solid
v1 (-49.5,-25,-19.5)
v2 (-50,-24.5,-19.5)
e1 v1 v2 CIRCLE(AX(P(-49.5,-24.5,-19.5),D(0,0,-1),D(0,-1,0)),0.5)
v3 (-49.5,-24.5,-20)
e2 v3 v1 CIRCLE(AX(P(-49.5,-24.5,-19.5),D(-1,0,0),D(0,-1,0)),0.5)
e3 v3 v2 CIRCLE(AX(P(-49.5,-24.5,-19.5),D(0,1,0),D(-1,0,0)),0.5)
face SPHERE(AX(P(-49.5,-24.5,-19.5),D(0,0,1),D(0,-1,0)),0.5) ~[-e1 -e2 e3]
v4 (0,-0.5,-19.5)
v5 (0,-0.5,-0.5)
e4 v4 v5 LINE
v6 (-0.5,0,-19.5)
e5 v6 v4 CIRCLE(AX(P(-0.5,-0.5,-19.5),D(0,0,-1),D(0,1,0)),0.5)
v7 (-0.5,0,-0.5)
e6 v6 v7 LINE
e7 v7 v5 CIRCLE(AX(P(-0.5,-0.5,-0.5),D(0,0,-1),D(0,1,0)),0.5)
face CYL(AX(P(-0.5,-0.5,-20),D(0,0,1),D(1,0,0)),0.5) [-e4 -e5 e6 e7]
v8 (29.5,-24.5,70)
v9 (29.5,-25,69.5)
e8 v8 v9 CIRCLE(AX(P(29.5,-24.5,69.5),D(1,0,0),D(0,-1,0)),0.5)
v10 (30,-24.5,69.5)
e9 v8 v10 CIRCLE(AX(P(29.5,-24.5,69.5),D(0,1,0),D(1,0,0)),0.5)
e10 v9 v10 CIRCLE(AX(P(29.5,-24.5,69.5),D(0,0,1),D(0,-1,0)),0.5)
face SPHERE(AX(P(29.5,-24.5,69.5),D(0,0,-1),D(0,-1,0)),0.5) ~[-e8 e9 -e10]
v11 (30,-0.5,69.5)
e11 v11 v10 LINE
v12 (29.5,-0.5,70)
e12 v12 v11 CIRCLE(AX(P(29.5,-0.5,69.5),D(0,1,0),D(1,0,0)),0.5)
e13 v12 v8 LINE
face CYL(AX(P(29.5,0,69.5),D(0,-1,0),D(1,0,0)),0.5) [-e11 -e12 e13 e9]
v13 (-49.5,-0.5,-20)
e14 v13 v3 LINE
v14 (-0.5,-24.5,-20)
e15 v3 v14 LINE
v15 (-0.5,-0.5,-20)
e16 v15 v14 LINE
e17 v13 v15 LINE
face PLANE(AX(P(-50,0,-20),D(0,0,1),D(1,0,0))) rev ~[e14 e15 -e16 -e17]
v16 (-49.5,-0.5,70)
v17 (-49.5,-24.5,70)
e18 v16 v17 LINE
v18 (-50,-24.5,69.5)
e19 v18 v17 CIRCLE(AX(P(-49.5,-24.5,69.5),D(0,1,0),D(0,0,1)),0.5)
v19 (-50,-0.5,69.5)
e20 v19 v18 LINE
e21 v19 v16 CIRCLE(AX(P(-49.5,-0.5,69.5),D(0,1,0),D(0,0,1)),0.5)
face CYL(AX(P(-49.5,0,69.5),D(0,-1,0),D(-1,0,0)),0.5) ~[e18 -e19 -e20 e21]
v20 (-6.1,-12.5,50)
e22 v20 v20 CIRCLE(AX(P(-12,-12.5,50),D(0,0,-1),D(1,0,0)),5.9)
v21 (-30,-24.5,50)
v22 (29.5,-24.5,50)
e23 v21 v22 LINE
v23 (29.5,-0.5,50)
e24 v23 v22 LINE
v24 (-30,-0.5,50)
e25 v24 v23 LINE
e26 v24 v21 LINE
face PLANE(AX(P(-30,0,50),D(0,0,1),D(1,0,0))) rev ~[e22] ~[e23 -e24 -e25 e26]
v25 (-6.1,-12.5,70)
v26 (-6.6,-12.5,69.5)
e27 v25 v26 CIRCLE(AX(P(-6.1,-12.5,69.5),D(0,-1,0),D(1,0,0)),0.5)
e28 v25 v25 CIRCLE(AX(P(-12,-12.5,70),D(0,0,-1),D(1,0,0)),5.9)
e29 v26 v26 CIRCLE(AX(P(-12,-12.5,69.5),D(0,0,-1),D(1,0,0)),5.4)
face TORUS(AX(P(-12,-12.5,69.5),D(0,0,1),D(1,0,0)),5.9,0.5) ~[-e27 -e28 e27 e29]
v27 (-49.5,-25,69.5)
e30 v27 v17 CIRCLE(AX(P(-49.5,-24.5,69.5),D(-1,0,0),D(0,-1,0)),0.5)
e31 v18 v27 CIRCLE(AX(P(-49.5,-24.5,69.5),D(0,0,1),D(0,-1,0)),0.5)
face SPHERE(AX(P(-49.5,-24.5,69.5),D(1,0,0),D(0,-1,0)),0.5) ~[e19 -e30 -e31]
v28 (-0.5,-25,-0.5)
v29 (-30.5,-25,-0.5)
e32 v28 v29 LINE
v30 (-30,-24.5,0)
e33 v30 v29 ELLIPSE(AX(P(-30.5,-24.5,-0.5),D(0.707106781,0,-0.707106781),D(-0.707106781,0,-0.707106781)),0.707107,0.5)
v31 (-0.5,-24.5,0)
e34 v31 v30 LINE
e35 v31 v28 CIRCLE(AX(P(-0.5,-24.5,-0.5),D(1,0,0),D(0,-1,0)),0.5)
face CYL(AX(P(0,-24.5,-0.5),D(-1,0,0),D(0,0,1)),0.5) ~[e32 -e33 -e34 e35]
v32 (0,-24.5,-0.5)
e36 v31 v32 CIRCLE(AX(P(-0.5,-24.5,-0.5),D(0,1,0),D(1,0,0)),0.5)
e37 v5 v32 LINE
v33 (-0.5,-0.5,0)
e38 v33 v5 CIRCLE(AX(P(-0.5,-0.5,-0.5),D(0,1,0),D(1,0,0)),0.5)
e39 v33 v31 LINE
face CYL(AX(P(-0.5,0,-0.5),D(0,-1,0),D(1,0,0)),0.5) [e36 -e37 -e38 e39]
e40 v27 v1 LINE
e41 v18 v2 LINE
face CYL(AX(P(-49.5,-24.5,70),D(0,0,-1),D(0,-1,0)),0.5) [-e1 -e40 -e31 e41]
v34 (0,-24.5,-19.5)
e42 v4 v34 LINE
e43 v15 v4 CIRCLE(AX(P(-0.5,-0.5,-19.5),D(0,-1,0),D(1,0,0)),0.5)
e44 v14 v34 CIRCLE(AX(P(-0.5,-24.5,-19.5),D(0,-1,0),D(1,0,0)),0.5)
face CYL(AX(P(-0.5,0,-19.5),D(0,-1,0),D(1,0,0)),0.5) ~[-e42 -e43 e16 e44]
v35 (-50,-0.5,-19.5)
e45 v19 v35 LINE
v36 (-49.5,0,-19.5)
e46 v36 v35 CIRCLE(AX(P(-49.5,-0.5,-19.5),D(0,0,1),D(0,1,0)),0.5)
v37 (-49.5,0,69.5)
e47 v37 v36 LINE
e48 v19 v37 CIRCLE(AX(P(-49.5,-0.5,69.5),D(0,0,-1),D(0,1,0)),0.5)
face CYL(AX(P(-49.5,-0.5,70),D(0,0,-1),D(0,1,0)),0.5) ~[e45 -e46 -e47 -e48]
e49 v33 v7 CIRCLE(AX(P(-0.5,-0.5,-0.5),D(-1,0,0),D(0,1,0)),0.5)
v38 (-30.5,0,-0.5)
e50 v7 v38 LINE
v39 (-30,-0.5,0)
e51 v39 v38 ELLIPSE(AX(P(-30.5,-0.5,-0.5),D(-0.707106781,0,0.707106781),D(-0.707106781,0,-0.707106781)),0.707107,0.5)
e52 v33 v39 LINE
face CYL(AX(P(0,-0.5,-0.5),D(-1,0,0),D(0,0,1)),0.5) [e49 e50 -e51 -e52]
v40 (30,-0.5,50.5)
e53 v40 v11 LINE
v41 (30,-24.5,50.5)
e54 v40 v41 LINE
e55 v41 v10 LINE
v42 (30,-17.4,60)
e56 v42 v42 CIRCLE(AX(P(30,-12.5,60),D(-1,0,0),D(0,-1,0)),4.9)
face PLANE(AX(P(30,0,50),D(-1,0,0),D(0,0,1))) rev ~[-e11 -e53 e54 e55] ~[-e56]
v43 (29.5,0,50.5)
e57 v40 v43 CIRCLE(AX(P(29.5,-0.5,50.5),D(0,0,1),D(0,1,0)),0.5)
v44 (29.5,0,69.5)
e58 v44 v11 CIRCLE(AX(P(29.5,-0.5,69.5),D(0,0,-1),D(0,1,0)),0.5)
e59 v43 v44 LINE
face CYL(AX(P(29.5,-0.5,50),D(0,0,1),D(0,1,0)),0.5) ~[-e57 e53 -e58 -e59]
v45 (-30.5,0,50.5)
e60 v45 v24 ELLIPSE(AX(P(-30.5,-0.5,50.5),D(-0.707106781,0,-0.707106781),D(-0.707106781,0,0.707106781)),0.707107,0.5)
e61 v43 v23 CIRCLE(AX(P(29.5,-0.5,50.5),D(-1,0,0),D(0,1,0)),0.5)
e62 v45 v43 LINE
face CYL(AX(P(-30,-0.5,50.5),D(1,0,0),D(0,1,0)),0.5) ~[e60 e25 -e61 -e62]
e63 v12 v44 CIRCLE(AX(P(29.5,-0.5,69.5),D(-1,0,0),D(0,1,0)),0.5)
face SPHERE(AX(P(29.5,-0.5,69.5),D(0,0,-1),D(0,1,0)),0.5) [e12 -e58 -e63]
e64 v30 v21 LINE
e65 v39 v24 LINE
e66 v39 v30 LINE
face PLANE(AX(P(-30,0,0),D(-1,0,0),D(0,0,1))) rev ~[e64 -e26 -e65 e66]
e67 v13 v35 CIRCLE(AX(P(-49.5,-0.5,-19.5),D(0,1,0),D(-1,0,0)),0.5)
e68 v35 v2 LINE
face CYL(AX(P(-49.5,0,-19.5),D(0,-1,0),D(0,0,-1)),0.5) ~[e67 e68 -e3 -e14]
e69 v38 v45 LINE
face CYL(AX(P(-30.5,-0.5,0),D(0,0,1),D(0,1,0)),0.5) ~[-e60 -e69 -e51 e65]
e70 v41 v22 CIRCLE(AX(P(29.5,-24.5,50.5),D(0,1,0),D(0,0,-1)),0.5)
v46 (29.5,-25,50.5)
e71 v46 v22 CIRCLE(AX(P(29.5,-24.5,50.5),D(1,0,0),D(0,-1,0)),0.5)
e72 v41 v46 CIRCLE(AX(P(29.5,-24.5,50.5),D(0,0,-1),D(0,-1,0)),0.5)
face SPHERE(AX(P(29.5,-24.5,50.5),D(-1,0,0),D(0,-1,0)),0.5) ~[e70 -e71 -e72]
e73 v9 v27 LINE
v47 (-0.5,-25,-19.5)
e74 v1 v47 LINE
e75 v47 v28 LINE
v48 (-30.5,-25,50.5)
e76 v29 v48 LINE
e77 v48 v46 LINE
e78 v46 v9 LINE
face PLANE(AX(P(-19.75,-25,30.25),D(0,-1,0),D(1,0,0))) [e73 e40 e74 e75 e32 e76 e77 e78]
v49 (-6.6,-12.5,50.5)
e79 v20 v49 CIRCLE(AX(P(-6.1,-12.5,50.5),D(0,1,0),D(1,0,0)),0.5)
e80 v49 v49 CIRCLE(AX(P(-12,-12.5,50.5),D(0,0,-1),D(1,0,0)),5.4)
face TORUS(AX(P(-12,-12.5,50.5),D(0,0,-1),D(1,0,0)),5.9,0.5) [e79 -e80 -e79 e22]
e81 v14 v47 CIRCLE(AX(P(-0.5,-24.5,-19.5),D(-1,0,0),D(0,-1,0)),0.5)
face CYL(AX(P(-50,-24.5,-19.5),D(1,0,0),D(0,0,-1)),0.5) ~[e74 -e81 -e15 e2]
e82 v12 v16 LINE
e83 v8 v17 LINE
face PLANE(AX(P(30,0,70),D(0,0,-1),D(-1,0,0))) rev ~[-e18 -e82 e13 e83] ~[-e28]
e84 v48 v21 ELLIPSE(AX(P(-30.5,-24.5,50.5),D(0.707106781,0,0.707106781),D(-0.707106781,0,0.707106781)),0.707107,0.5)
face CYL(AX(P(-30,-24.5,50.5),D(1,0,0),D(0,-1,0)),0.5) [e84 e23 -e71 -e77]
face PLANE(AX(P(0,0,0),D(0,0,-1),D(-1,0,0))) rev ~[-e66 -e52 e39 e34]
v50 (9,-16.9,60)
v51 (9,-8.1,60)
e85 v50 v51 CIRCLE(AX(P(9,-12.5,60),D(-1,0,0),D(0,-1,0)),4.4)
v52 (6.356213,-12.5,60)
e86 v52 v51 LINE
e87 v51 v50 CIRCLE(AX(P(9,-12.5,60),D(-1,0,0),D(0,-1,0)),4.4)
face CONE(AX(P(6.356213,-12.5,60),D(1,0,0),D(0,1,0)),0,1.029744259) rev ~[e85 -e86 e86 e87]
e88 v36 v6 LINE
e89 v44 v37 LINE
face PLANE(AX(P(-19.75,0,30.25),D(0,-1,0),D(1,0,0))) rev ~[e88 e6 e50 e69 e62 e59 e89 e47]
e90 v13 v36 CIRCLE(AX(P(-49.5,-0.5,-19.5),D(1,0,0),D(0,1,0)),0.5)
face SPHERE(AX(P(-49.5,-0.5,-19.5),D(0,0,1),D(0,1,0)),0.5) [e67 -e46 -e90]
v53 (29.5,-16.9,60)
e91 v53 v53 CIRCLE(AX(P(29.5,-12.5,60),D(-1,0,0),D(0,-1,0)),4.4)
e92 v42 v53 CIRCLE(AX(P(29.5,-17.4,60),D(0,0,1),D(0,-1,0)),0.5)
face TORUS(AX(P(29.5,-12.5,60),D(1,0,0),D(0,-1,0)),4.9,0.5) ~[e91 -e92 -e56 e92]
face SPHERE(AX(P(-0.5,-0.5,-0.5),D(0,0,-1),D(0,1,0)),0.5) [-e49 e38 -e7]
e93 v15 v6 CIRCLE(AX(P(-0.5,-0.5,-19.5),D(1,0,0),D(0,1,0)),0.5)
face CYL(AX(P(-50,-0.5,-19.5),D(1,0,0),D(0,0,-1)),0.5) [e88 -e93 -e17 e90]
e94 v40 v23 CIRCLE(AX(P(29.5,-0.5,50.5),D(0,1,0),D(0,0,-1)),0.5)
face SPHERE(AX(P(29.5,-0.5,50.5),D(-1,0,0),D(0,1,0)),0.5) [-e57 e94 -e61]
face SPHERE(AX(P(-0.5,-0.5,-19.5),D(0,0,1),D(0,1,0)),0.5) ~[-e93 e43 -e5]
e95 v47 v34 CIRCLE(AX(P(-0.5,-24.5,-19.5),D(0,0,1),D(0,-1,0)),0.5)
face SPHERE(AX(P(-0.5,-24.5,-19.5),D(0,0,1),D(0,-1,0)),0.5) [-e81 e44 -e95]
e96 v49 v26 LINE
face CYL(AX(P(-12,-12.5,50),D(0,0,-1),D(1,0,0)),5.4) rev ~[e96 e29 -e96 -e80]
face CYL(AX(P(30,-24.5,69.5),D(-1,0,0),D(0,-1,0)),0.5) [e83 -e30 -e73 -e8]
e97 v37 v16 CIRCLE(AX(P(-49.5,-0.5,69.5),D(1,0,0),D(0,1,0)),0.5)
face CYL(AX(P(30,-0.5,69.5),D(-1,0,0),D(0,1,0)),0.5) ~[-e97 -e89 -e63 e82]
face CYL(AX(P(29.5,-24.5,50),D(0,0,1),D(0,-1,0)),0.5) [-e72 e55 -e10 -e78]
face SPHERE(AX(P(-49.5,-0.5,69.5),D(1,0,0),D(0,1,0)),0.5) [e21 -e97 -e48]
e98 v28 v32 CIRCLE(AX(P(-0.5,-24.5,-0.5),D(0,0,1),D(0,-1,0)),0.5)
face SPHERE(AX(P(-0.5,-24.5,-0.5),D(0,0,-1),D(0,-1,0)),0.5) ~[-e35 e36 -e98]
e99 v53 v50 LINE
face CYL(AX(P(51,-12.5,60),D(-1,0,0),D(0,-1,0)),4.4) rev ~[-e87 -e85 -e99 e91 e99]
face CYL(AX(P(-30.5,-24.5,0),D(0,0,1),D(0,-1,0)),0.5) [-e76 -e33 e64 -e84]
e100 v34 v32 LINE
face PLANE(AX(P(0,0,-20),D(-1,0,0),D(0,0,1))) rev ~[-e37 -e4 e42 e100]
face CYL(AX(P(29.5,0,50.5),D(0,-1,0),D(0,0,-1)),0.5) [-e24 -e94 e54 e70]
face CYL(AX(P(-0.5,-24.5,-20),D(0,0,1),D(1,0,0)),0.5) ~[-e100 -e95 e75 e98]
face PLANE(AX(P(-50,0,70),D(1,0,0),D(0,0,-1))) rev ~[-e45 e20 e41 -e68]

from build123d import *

# Parameters (mm, degrees)
F1_DEPTH = 25
F3_D     = 10.8
F3_DEPTH = 21
F3_TIP   = 3.2446473427
F5_D     = 8.8
F5_DEPTH = 21
F5_TIP   = 2.6437867237
F6_R     = 0.5


with BuildPart() as f1:
    # F0 (on Front) → F1 (new body)
    with BuildSketch(Plane.XZ):
        Polygon((0, -20), (0, 0), (-30, 0), (-30, 50), (30, 50), (30, 70), (-50, 70), (-50, -20), align=None)
    extrude(amount=F1_DEPTH)

    # F3 (one way)
    with BuildSketch(Plane(origin=(0, 0, 50), x_dir=(1, 0, 0), z_dir=(0, 0, -1))):
        with Locations((-12, 12.5)):
            Circle(F3_D / 2)
    extrude(amount=-F3_DEPTH, mode=Mode.SUBTRACT)
    with Locations(Plane(origin=(0, 0, 50), x_dir=(1, 0, 0), z_dir=(0, 0, -1))):
        with Locations((-12, 12.5)):
            with Locations((0, 0, -(F3_DEPTH + F3_TIP / 2))):  # 118° drill point
                Cone(0, F3_D / 2, F3_TIP, mode=Mode.SUBTRACT)

    # F5
    with Locations(Plane.YZ.offset(30)):
        with Locations((-12.5, 60)):
            Hole(F5_D / 2, depth=F5_DEPTH)
            with Locations((0, 0, -(F5_DEPTH + F5_TIP / 2))):  # 118° drill point
                Cone(0, F5_D / 2, F5_TIP, mode=Mode.SUBTRACT)

    # F6
    f6_edges = [f1.edges().sort_by_distance(p)[0] for p in [
        (0, -25, -10),
        (-15, -25, 0),
        (-30, -25, 25),
        (0, -25, 50),
        (30, -25, 60),
        (-10, -25, 70),
        (-50, -25, 25),
        (-25, -25, -20),
        (0, 0, -10),
        (-15, 0, 0),
        (-30, 0, 25),
        (0, 0, 50),
        (30, 0, 60),
        (-10, 0, 70),
        (-50, 0, 25),
        (-25, 0, -20),
        (30, -12.5, 70),
        (30, -12.5, 50),
        (0, -12.5, -20),
        (0, -12.5, 0),
        (-50, -12.5, -20),
        (-50, -12.5, 70),
        (-17.4, -12.5, 50),
        (30, -16.9, 60),
        (-17.4, -12.5, 70),
    ]]
    fillet(f6_edges, radius=F6_R)


solid = f1.part
